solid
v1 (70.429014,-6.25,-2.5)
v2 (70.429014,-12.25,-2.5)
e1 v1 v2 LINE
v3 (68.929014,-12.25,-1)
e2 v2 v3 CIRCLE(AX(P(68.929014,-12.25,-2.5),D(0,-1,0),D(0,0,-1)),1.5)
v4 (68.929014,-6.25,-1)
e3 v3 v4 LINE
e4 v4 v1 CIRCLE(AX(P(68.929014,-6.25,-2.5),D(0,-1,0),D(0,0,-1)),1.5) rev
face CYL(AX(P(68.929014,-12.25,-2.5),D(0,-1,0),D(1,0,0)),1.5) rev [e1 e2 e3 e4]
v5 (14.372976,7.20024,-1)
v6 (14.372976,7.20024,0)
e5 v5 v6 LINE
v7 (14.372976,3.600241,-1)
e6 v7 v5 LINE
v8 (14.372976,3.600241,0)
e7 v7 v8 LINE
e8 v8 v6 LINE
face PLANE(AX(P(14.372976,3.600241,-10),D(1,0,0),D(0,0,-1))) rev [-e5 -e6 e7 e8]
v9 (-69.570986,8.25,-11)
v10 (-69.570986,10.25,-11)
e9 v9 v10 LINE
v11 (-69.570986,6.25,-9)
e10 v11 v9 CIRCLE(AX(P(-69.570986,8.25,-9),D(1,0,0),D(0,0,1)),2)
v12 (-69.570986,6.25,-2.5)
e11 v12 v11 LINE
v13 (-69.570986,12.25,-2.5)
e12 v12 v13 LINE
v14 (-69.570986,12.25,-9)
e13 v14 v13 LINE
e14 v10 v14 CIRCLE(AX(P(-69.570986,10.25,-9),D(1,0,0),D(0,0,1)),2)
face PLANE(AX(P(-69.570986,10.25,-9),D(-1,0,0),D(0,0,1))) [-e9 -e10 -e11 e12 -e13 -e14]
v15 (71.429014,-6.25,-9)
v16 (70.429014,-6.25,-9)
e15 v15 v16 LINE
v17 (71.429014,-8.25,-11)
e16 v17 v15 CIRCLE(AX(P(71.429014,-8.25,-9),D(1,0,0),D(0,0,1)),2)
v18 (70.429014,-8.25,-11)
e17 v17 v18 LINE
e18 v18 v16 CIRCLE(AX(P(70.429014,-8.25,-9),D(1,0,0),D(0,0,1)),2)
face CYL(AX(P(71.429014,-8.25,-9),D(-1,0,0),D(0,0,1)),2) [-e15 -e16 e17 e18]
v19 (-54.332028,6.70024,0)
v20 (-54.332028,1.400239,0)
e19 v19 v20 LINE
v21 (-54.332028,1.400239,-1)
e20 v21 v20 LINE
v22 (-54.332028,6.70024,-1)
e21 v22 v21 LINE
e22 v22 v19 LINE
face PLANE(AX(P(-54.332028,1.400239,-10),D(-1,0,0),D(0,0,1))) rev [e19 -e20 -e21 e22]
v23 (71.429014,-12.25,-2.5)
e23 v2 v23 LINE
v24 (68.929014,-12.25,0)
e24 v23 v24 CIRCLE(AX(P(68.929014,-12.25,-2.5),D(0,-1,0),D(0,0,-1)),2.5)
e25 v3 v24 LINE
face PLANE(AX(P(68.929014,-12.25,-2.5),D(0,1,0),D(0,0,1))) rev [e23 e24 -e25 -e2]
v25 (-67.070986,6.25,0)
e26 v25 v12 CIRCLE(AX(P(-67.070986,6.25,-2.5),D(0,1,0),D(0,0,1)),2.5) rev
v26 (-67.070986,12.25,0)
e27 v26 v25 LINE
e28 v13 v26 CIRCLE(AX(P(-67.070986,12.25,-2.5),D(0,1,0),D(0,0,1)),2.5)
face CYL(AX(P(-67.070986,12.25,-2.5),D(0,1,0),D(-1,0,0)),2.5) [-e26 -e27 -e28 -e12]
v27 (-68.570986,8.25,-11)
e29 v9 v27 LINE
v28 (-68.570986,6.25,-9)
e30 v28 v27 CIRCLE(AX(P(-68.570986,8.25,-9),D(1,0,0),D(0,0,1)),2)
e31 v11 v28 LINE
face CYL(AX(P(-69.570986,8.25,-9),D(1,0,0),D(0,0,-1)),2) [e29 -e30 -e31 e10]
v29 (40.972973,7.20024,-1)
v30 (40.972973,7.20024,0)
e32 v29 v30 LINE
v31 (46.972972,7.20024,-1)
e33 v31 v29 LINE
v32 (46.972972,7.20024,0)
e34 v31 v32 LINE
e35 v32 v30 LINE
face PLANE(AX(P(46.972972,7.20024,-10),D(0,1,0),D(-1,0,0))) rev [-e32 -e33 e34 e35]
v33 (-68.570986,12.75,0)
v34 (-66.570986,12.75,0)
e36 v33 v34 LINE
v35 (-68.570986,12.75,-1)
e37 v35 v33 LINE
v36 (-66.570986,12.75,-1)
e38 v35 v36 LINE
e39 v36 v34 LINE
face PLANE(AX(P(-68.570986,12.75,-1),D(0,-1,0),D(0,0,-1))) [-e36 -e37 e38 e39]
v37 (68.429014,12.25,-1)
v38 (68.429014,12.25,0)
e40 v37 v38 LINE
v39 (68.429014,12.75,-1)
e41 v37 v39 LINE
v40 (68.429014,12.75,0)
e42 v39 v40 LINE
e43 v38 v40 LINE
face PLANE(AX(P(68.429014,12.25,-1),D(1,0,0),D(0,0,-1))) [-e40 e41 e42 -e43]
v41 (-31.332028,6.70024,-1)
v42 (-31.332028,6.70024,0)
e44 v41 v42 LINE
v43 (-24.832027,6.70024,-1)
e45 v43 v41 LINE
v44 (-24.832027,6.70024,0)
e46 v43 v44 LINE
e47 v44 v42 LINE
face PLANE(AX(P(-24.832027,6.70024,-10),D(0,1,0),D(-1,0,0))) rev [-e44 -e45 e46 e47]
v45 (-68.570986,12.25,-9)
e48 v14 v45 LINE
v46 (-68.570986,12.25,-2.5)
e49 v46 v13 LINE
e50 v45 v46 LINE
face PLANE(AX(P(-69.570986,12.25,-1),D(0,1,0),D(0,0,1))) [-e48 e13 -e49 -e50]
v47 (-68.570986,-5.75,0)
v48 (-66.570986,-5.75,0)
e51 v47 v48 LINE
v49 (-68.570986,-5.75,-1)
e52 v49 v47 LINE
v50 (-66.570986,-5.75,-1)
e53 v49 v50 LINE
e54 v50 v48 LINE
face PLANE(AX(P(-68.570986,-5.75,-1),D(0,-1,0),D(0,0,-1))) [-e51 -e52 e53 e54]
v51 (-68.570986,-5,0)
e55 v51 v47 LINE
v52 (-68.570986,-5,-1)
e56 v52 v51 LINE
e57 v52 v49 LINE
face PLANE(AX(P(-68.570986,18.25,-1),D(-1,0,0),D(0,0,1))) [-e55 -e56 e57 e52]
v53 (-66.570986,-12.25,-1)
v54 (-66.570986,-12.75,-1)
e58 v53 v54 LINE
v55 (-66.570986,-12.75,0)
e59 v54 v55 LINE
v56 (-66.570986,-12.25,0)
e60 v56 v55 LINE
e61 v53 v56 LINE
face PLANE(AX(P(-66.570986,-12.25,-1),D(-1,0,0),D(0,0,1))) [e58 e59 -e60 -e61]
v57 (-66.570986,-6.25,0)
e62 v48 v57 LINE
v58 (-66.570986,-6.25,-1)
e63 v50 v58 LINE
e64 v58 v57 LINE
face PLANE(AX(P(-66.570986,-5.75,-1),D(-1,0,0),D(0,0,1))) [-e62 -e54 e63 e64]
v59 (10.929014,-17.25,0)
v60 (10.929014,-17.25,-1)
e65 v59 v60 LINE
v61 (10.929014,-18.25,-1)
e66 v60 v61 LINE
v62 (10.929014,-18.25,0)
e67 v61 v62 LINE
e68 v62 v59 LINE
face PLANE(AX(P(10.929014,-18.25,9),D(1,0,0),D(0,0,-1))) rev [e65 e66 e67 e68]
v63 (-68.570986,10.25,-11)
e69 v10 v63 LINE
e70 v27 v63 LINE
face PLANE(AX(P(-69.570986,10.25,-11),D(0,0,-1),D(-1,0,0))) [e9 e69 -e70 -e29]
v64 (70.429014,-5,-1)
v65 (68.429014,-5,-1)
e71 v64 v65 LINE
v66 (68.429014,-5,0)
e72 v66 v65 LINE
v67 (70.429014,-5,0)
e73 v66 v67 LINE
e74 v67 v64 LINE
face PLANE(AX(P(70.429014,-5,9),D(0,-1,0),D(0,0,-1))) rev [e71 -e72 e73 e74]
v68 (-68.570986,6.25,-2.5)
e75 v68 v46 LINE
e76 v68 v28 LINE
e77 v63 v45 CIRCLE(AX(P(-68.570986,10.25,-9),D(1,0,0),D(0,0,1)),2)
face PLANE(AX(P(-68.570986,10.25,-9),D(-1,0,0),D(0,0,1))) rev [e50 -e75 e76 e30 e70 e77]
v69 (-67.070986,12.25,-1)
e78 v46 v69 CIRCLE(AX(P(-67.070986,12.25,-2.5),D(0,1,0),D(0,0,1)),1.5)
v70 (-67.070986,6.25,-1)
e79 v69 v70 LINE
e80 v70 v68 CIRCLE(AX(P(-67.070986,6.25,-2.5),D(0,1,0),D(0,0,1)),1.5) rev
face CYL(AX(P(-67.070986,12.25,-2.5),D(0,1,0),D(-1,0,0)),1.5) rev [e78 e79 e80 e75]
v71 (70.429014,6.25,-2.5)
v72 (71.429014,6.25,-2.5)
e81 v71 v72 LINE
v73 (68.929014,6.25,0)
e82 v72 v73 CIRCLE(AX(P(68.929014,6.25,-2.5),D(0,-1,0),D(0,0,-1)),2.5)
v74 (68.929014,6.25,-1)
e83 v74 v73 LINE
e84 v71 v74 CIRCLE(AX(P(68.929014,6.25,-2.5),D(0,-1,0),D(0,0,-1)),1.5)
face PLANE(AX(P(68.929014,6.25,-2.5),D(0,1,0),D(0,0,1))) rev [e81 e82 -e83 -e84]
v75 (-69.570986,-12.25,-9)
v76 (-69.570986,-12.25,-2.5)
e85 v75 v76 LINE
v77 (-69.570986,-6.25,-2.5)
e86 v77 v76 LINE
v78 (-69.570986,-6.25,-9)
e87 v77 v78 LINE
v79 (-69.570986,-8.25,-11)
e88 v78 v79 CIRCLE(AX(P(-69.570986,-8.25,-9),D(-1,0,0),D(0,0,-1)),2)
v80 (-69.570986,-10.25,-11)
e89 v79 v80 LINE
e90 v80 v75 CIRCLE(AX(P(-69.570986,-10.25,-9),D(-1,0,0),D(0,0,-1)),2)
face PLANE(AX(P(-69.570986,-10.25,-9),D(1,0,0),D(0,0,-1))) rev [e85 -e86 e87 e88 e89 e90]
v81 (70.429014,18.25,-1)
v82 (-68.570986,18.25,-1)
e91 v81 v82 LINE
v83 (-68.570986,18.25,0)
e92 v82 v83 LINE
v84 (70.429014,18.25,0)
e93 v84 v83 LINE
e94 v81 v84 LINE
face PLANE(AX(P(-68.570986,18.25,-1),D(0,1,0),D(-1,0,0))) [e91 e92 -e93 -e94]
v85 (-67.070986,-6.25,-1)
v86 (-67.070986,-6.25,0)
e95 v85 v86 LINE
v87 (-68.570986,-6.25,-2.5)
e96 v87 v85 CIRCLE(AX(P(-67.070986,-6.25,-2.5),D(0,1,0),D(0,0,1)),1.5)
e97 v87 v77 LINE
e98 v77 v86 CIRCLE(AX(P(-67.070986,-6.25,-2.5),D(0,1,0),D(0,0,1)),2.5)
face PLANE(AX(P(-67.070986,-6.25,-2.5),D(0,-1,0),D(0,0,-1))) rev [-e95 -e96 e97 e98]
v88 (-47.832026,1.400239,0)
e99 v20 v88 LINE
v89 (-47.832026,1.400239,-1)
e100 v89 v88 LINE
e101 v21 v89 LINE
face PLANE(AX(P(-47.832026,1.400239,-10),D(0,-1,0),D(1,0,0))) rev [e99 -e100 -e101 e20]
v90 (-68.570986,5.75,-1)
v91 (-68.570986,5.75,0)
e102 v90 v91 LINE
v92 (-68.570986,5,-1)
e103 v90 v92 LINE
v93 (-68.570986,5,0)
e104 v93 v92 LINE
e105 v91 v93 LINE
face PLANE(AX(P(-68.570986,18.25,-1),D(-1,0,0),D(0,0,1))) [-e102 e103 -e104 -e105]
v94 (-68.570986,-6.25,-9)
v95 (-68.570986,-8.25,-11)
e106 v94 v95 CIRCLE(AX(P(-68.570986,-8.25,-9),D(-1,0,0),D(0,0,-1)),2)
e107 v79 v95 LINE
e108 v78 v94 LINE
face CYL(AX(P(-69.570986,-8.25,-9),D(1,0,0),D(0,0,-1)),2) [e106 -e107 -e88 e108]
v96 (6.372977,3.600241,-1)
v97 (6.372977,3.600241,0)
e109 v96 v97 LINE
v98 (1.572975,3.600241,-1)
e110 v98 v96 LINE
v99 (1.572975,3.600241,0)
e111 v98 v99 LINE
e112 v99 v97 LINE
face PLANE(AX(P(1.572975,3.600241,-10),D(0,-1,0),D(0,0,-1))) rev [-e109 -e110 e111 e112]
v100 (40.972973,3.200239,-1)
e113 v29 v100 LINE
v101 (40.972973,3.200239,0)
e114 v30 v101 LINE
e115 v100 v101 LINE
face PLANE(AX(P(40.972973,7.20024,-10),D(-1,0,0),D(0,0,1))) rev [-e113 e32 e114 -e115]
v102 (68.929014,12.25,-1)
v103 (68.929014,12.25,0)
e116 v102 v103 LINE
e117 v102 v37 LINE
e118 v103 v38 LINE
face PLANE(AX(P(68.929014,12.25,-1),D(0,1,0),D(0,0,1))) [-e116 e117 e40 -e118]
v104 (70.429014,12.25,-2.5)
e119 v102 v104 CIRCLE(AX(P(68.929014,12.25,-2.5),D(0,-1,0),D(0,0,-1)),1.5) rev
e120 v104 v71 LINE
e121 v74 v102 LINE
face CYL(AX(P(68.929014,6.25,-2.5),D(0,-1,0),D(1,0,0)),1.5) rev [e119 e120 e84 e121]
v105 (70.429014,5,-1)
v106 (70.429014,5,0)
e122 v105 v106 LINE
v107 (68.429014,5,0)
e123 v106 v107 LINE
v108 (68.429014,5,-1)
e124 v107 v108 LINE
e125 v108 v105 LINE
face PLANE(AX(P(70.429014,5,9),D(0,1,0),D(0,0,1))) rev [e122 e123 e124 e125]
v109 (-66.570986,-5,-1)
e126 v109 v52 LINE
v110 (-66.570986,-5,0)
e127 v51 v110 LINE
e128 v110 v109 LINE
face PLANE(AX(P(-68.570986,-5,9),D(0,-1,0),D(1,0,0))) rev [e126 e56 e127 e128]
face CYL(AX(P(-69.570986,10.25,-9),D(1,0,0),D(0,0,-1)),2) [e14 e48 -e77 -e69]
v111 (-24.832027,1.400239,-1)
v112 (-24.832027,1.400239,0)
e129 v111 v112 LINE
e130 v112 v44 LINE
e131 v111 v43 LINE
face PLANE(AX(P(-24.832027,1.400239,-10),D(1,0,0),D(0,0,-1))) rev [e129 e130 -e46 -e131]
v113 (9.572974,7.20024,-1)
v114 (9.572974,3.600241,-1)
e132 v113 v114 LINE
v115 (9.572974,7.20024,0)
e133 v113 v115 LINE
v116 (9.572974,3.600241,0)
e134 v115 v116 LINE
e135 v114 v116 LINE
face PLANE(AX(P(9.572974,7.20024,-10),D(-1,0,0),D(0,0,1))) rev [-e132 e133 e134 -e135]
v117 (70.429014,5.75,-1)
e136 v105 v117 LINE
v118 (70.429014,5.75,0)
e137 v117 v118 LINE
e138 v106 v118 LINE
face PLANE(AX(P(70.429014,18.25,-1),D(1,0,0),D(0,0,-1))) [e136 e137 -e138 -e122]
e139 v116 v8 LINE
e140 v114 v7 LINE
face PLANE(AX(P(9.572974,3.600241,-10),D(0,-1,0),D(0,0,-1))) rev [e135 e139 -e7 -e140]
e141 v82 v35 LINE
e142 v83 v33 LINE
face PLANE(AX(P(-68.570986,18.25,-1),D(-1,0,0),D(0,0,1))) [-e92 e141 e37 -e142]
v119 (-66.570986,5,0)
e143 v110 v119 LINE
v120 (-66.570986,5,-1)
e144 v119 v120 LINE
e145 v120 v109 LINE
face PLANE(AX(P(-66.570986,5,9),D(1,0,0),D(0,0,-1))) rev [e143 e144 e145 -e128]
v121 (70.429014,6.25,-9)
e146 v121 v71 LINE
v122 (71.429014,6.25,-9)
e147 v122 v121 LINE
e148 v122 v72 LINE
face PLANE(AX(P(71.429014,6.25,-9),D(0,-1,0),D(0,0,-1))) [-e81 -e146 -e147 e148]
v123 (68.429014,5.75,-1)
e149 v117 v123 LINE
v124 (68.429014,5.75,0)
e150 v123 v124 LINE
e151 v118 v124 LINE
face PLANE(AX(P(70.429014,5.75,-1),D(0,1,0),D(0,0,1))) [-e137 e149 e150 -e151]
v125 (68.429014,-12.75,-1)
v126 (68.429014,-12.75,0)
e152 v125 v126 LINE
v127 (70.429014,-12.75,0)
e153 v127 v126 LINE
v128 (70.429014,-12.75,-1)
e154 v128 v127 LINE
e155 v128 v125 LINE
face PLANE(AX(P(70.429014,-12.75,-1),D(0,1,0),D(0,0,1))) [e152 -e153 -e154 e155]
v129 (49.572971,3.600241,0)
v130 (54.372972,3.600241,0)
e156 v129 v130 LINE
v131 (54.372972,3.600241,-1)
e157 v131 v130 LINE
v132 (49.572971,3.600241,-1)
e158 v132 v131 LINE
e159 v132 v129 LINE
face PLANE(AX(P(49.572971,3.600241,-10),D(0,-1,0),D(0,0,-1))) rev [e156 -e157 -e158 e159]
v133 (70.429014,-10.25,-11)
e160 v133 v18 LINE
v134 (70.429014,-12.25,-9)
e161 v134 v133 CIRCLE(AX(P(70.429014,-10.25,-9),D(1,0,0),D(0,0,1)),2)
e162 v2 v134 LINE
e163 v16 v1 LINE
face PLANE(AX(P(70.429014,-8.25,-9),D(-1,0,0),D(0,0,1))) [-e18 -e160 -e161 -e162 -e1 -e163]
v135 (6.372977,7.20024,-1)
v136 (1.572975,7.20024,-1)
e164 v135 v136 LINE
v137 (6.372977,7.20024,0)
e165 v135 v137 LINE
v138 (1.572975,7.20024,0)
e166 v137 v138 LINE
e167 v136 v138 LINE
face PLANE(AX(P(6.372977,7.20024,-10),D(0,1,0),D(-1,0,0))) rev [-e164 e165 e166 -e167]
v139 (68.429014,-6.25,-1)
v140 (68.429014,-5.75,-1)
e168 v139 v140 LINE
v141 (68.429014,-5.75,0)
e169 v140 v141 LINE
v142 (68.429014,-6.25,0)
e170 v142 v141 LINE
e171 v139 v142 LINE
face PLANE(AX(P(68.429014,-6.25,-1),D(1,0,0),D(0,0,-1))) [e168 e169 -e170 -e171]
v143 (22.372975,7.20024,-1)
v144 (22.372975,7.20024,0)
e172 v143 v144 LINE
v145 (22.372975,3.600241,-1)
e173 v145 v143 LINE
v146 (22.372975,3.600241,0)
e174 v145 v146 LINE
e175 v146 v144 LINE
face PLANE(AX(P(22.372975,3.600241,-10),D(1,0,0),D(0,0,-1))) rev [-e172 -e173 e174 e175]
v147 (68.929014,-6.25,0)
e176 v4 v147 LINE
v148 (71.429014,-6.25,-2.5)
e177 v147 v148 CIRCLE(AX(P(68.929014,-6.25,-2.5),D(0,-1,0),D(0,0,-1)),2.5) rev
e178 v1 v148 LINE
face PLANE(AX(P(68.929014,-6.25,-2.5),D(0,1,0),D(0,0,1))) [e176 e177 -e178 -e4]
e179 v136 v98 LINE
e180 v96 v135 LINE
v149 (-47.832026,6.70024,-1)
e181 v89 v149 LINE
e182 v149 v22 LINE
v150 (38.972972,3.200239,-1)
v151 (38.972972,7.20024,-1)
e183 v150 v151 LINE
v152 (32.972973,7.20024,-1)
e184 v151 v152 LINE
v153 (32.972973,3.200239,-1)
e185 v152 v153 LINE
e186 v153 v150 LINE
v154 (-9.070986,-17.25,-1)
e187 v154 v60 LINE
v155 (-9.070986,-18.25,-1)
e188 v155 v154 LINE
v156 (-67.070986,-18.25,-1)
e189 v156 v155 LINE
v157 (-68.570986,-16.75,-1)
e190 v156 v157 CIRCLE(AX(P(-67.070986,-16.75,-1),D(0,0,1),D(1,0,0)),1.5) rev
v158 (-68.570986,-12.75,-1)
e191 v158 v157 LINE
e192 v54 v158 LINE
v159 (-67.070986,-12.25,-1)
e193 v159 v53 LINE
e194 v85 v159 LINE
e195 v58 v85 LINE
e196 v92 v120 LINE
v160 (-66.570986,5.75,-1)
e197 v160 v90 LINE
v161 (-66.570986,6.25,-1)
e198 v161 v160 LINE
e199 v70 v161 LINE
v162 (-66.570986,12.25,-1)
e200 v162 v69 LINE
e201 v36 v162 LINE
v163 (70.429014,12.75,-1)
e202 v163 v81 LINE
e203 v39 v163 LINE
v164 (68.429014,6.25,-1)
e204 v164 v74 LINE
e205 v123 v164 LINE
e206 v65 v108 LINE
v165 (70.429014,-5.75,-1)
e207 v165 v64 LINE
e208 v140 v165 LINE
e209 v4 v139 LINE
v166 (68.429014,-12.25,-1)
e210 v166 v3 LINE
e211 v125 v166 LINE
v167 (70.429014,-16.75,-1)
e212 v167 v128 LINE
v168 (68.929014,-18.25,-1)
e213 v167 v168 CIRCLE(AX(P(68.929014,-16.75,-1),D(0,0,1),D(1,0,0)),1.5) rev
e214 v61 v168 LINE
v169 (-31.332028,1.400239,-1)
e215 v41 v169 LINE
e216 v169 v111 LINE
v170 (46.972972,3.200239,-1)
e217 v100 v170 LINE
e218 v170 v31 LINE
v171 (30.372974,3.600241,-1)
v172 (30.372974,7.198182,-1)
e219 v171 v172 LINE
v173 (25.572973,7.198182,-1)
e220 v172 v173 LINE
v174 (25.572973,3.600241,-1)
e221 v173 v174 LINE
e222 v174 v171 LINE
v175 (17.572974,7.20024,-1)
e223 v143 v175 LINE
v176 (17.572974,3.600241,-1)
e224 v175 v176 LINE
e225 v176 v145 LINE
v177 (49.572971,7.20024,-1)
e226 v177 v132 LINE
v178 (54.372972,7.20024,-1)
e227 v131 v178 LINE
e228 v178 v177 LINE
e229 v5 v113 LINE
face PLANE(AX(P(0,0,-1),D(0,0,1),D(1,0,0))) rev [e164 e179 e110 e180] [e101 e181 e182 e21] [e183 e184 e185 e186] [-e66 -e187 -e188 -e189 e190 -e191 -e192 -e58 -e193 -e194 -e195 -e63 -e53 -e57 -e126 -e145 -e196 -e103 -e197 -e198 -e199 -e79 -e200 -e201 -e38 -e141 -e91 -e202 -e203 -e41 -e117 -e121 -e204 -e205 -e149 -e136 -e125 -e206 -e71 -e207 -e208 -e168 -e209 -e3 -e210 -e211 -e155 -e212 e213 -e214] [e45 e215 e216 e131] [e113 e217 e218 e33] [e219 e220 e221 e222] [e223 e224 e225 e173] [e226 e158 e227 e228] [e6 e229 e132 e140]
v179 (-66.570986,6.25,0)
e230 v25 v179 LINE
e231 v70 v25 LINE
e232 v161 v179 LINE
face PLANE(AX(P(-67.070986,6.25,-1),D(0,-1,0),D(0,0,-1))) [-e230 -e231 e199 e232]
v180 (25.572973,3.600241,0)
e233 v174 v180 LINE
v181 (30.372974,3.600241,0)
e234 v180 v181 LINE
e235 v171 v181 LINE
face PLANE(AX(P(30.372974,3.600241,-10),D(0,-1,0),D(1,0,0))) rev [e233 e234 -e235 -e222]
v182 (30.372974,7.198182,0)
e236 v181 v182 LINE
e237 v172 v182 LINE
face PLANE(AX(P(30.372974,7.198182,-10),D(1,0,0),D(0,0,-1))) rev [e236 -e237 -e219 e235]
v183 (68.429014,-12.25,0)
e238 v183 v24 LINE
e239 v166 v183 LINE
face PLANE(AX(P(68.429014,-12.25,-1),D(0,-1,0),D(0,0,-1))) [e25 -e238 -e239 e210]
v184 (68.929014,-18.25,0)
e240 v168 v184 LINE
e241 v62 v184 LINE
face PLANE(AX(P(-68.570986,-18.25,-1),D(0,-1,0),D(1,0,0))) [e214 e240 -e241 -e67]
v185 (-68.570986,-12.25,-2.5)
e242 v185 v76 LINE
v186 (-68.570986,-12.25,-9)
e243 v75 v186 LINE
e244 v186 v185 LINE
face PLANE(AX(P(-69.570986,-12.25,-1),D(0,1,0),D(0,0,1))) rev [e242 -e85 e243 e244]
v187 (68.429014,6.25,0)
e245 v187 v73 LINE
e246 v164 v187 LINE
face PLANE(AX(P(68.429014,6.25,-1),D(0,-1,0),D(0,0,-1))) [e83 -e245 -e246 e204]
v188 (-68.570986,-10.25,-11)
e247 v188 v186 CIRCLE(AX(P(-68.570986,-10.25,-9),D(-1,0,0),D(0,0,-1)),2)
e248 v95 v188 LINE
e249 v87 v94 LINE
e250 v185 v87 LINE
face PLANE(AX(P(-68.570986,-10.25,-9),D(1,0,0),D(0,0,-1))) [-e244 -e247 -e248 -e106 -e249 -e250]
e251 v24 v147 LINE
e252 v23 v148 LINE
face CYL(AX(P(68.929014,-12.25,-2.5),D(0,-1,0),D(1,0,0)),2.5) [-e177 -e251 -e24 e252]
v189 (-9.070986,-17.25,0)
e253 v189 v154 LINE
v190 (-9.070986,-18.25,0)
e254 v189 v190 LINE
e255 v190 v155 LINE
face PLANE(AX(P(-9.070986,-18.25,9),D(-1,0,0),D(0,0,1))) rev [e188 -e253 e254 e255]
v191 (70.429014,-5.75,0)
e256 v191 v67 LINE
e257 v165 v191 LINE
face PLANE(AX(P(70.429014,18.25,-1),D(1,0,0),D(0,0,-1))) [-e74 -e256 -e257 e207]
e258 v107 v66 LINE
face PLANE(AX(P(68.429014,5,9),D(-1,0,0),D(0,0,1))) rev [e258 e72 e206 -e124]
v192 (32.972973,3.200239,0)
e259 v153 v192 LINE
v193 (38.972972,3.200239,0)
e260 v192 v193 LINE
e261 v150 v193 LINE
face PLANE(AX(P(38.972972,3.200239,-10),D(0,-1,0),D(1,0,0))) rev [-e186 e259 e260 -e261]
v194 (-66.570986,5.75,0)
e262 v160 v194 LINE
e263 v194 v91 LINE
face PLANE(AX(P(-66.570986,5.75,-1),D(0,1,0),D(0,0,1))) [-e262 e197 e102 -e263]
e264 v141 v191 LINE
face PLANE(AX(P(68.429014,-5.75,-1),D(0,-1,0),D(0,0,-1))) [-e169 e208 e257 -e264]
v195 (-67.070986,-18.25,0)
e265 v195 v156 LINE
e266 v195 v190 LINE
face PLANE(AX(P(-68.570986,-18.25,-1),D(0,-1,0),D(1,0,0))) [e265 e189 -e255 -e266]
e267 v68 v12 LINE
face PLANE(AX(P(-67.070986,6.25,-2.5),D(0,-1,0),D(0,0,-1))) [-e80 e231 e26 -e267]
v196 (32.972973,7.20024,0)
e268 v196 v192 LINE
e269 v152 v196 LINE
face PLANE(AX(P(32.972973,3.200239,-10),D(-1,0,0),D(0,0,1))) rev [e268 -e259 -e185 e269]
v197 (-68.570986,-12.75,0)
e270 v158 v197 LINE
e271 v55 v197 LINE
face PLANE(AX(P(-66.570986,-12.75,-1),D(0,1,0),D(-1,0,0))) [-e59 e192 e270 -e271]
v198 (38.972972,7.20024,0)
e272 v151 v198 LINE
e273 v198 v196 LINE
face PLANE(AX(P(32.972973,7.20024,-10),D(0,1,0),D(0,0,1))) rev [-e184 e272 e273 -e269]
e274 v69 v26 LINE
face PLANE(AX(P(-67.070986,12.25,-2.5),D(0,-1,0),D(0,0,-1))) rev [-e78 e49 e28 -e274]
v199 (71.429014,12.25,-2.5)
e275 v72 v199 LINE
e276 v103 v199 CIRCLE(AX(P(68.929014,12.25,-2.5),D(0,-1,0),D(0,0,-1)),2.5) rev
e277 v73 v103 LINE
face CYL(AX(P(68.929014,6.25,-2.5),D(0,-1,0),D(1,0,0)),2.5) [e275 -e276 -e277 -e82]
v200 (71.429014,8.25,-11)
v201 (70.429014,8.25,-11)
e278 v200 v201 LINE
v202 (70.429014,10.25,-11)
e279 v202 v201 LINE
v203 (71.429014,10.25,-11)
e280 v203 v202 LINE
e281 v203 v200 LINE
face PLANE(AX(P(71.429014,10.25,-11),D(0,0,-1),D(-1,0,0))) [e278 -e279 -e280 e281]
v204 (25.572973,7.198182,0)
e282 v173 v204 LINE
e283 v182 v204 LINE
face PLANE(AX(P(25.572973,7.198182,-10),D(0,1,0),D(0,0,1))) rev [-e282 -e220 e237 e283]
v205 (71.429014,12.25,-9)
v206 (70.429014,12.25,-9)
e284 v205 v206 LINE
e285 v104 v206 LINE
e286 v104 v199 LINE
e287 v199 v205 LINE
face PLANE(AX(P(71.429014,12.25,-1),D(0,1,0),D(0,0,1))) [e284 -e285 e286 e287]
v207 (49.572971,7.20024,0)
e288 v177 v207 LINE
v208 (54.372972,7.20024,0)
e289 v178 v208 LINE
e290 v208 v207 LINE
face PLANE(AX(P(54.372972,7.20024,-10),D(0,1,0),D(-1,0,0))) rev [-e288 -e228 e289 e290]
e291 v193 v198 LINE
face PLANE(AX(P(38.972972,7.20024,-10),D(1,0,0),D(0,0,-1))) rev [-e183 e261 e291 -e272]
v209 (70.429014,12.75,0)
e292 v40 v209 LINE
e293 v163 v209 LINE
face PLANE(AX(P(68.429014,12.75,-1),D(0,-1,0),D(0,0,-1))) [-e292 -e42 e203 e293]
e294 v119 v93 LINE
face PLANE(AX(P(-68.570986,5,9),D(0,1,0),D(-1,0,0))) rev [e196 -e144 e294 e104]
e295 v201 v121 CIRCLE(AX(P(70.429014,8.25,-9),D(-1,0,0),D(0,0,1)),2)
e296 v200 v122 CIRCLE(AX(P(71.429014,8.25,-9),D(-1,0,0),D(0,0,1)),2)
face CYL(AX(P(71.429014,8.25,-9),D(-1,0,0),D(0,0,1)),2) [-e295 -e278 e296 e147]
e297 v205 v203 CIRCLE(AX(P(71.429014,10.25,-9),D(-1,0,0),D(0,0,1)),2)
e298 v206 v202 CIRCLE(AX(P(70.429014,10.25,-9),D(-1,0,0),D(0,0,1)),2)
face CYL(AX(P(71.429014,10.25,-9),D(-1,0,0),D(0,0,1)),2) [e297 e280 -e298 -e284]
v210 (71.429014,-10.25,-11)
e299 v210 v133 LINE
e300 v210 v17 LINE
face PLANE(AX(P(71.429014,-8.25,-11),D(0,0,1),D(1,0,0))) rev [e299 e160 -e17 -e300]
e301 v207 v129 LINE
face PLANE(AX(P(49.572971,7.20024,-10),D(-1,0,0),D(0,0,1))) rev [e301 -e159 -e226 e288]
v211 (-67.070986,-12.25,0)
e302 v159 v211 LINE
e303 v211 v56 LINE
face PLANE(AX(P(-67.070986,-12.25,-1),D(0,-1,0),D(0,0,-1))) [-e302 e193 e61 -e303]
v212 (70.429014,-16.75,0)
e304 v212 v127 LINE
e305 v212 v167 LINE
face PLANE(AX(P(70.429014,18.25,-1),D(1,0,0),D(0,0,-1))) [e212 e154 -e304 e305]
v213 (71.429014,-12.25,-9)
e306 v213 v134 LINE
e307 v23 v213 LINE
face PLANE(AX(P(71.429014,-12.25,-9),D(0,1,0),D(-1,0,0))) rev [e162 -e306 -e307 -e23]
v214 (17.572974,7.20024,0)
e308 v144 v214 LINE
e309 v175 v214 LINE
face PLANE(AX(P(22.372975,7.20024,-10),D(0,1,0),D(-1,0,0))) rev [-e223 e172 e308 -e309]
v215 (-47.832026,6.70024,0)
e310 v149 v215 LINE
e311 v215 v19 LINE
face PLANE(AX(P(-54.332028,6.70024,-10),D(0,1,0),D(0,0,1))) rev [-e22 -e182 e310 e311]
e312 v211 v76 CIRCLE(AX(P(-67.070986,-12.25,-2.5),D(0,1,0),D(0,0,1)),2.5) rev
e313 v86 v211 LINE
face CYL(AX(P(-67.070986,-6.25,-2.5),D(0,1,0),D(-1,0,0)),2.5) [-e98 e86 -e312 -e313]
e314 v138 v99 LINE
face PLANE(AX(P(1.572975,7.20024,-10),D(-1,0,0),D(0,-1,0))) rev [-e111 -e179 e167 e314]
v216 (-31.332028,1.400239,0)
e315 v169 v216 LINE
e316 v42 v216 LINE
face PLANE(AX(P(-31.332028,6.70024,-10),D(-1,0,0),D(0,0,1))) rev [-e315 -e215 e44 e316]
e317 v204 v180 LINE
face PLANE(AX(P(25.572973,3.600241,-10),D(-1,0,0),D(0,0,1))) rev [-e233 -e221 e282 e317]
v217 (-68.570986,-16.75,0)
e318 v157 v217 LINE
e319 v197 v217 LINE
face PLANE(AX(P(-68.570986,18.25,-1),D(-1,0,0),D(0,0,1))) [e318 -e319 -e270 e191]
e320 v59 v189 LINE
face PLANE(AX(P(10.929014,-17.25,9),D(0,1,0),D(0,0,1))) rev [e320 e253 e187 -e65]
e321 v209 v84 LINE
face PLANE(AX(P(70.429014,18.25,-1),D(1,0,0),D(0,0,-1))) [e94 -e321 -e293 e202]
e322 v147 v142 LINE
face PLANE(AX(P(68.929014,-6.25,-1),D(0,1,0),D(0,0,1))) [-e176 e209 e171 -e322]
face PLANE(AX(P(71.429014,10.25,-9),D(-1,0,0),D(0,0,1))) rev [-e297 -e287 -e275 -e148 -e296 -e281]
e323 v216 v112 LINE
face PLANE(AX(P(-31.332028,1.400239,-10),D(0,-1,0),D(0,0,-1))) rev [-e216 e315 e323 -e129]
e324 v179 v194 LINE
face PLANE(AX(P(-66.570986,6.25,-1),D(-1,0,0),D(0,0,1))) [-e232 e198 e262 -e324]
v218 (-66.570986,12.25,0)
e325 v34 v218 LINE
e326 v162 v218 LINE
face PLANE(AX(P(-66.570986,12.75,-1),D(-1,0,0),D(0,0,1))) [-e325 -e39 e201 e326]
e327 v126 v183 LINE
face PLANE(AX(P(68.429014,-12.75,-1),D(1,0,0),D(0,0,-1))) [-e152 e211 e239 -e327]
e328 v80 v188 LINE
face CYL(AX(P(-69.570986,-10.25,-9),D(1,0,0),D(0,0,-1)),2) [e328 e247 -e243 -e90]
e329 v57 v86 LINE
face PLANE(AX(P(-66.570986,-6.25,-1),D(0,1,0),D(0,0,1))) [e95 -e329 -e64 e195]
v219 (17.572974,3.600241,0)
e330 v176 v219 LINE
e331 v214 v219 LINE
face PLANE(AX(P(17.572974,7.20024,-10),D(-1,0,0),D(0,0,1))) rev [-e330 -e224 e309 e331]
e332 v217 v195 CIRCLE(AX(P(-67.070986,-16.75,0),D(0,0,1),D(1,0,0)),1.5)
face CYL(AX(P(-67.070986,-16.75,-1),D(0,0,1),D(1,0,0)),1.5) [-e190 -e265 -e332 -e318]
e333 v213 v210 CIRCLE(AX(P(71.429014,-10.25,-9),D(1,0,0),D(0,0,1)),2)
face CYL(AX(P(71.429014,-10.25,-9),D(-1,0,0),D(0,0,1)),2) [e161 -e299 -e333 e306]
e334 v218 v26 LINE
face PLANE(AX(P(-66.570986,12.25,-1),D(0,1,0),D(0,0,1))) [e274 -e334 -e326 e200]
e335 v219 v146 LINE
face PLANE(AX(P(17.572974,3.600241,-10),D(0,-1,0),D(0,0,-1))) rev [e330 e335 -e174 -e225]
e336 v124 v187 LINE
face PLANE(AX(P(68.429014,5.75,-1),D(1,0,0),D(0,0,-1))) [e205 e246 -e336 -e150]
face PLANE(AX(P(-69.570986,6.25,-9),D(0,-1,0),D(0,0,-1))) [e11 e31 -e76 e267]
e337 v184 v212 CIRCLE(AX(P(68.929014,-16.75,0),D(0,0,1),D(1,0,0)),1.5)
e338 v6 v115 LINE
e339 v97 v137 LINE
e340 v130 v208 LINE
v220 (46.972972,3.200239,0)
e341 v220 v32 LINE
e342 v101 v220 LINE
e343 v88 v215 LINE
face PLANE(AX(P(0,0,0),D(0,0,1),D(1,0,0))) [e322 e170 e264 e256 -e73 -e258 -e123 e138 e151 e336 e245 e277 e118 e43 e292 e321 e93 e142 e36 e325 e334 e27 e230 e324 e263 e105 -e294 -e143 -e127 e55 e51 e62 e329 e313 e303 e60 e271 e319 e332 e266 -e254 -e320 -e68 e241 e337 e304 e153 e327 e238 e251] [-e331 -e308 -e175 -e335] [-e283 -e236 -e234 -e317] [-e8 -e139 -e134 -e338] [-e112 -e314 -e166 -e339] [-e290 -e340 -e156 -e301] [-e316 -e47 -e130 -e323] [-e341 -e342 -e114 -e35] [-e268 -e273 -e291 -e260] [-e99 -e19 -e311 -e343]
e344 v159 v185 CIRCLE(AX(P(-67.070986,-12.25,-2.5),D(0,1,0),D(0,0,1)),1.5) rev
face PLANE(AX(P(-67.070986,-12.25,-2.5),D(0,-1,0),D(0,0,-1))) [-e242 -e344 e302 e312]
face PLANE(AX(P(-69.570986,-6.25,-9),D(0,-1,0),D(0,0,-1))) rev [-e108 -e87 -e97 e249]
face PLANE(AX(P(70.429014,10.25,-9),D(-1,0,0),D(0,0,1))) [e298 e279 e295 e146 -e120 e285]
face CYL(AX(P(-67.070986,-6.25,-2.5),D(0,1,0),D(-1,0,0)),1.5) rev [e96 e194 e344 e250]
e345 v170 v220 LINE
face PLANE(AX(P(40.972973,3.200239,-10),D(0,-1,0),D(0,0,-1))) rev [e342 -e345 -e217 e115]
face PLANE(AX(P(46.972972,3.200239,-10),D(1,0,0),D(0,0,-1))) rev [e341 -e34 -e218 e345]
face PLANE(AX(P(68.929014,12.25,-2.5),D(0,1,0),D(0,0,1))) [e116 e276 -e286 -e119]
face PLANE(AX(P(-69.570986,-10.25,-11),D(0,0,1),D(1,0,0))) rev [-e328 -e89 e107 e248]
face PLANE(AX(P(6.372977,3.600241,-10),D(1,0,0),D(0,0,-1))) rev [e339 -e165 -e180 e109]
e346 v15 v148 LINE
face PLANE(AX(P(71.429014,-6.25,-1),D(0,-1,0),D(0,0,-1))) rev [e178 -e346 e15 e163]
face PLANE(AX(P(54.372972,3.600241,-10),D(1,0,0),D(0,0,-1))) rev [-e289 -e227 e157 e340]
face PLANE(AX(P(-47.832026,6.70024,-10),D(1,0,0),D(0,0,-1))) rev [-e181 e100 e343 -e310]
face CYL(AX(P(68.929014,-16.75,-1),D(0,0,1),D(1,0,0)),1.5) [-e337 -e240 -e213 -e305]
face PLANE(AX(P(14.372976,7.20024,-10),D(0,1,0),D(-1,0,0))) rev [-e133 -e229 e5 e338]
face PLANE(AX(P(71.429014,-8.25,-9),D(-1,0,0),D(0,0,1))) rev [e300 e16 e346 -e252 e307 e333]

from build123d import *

# Parameters (mm, degrees)
SKETCH1_W                       = 139
SKETCH1_H                       = 36.5
BASE_FLANGE1_DEPTH              = 1
EDGE_FLANGE1_STRIP_W            = 7
EDGE_FLANGE1_STRIP_H            = 1
EDGE_FLANGE1_STRIP_CUT_DEPTH    = 6
EDGE_FLANGE1_RELIEF_W           = 7.5
EDGE_FLANGE1_RELIEF_H           = 0.5
EDGE_FLANGE1_RELIEF_CUT_DEPTH   = 1
EDGE_FLANGE1_STRIP_2_W          = 7
EDGE_FLANGE1_STRIP_2_H          = 1
EDGE_FLANGE1_STRIP_CUT_2_DEPTH  = 6
EDGE_FLANGE1_RELIEF_2_W         = 7.5
EDGE_FLANGE1_RELIEF_2_H         = 0.5
EDGE_FLANGE1_RELIEF_CUT_2_DEPTH = 1
EDGE_FLANGE1_DEPTH              = 6
EDGE_FLANGE1_START              = -1
EDGE_FLANGE1_FLAT_DEPTH         = 1
EDGE_FLANGE1_BEND_DEPTH         = 6
EDGE_FLANGE1_FLAT_2_DEPTH       = 1
EDGE_FLANGE2_STRIP_W            = 7
EDGE_FLANGE2_STRIP_H            = 1
EDGE_FLANGE2_STRIP_CUT_DEPTH    = 6
EDGE_FLANGE2_RELIEF_W           = 7.5
EDGE_FLANGE2_RELIEF_H           = 0.5
EDGE_FLANGE2_RELIEF_CUT_DEPTH   = 1
EDGE_FLANGE2_STRIP_2_W          = 7
EDGE_FLANGE2_STRIP_2_H          = 1
EDGE_FLANGE2_STRIP_CUT_2_DEPTH  = 6
EDGE_FLANGE2_RELIEF_2_W         = 7.5
EDGE_FLANGE2_RELIEF_2_H         = 0.5
EDGE_FLANGE2_RELIEF_CUT_2_DEPTH = 1
EDGE_FLANGE2_DEPTH              = 6
EDGE_FLANGE2_START              = 1
EDGE_FLANGE2_FLAT_DEPTH         = 1
EDGE_FLANGE2_BEND_DEPTH         = 6
EDGE_FLANGE2_FLAT_2_DEPTH       = 1
SKETCH20_W                      = 20
SKETCH20_H                      = 1
SKETCH20_W_2                    = 2
SKETCH20_H_2                    = 10
CUT_EXTRUDE1_DEPTH              = 10
FILLET1_R                       = 1.5
SKETCH28_W                      = 4.80000148
SKETCH28_H                      = 3.5999988
SKETCH28_H_2                    = 3.597941299
SKETCH28_W_2                    = 5.99999908
SKETCH28_H_3                    = 4.00000054
SKETCH28_W_3                    = 6.50000116
SKETCH28_H_4                    = 5.30000102
CUT_EXTRUDE3_DEPTH              = 10


# Sheet-metal steps are written as plain solids
with BuildPart() as part:
    # Sketch1 → Base-Flange1 (new body)
    with BuildSketch(Plane.XY):
        with Locations((0.929014267, 0)):
            Rectangle(SKETCH1_W, SKETCH1_H)
    extrude(amount=-BASE_FLANGE1_DEPTH)

    # Edge-Flange1 strip (across the edge) → Edge-Flange1 strip cut (cut)
    with BuildSketch(Plane(origin=(-68.570985733, 6.25, -1), x_dir=(1, 0, 0), z_dir=(0, 1, 0))):
        with Locations((-2, -0.5)):
            Rectangle(EDGE_FLANGE1_STRIP_W, EDGE_FLANGE1_STRIP_H)
    extrude(amount=EDGE_FLANGE1_STRIP_CUT_DEPTH, mode=Mode.SUBTRACT)

    # Edge-Flange1 relief (on the sheet) → Edge-Flange1 relief cut (cut)
    with BuildSketch(Plane(origin=(-67.070985733, 6.25, -1), x_dir=(1, 0, 0), z_dir=(0, 0, -1))):
        with Locations((-3.25, 0.25)):
            Rectangle(EDGE_FLANGE1_RELIEF_W, EDGE_FLANGE1_RELIEF_H)
        with Locations((-3.25, -6.25)):
            Rectangle(EDGE_FLANGE1_RELIEF_W, EDGE_FLANGE1_RELIEF_H)
    extrude(amount=-EDGE_FLANGE1_RELIEF_CUT_DEPTH, mode=Mode.SUBTRACT)

    # Edge-Flange1 strip 2 (across the edge) → Edge-Flange1 strip cut 2 (cut)
    with BuildSketch(Plane(origin=(70.429014267, 12.25, -1), x_dir=(-1, 0, 0), z_dir=(0, -1, 0))):
        with Locations((-2, -0.5)):
            Rectangle(EDGE_FLANGE1_STRIP_2_W, EDGE_FLANGE1_STRIP_2_H)
    extrude(amount=EDGE_FLANGE1_STRIP_CUT_2_DEPTH, mode=Mode.SUBTRACT)

    # Edge-Flange1 relief 2 (on the sheet) → Edge-Flange1 relief cut 2 (cut)
    with BuildSketch(Plane(origin=(68.929014267, 12.25, -1), x_dir=(-1, 0, 0), z_dir=(0, 0, -1))):
        with Locations((-3.25, 0.25)):
            Rectangle(EDGE_FLANGE1_RELIEF_2_W, EDGE_FLANGE1_RELIEF_2_H)
        with Locations((-3.25, -6.25)):
            Rectangle(EDGE_FLANGE1_RELIEF_2_W, EDGE_FLANGE1_RELIEF_2_H)
    extrude(amount=-EDGE_FLANGE1_RELIEF_CUT_2_DEPTH, mode=Mode.SUBTRACT)

    # Edge-Flange1 bend section (across the edge) → Edge-Flange1 (add)
    with BuildSketch(Plane(origin=(-68.570985733, 6.25, -1), x_dir=(1, 0, 0), z_dir=(0, 1, 0))):
        with BuildLine():
            Line((-1, 1.5), (0, 1.5))
            ThreePointArc((0, 1.5), (0.439339828, 0.439339828), (1.5, 0))
            Line((1.5, 0), (1.5, -1))
            ThreePointArc((1.5, -1), (-0.267766953, -0.267766953), (-1, 1.5))
        make_face()
    extrude(amount=EDGE_FLANGE1_DEPTH)

    # Edge-Flange1 profile (on flange) → Edge-Flange1 flat (add)
    with BuildSketch(Plane(origin=(-68.570985733, 0, -1), x_dir=(0, -1, 0), z_dir=(1, 0, 0)).offset(EDGE_FLANGE1_START)):
        with BuildLine():
            ThreePointArc((-6.25, 8), (-6.835786438, 9.414213562), (-8.25, 10))
            Line((-8.25, 10), (-10.25, 10))
            ThreePointArc((-10.25, 10), (-11.664213562, 9.414213562), (-12.25, 8))
            Line((-12.25, 8), (-12.25, 1.5))
            Line((-12.25, 1.5), (-6.25, 1.5))
            Line((-6.25, 1.5), (-6.25, 8))
        make_face()
    extrude(amount=EDGE_FLANGE1_FLAT_DEPTH)

    # Edge-Flange1 bend section 2 (across the edge) → Edge-Flange1 bend (add)
    with BuildSketch(Plane(origin=(70.429014267, 12.25, -1), x_dir=(-1, 0, 0), z_dir=(0, -1, 0))):
        with BuildLine():
            Line((-1, 1.5), (0, 1.5))
            ThreePointArc((0, 1.5), (0.439339828, 0.439339828), (1.5, 0))
            Line((1.5, 0), (1.5, -1))
            ThreePointArc((1.5, -1), (-0.267766953, -0.267766953), (-1, 1.5))
        make_face()
    extrude(amount=EDGE_FLANGE1_BEND_DEPTH)

    # Edge-Flange1 profile 2 (on flange) → Edge-Flange1 flat 2 (add)
    with BuildSketch(Plane(origin=(70.429014267, 0, -1), x_dir=(0, 1, 0), z_dir=(-1, 0, 0)).offset(EDGE_FLANGE1_START)):
        with BuildLine():
            Line((12.25, 1.5), (12.25, 8))
            ThreePointArc((12.25, 8), (11.664213562, 9.414213562), (10.25, 10))
            Line((10.25, 10), (8.25, 10))
            ThreePointArc((8.25, 10), (6.835786438, 9.414213562), (6.25, 8))
            Line((6.25, 8), (6.25, 1.5))
            Line((6.25, 1.5), (12.25, 1.5))
        make_face()
    extrude(amount=EDGE_FLANGE1_FLAT_2_DEPTH)

    # Edge-Flange2 strip (across the edge) → Edge-Flange2 strip cut (cut)
    with BuildSketch(Plane(origin=(70.429014267, -6.25, -1), x_dir=(-1, 0, 0), z_dir=(0, -1, 0))):
        with Locations((-2, -0.5)):
            Rectangle(EDGE_FLANGE2_STRIP_W, EDGE_FLANGE2_STRIP_H)
    extrude(amount=EDGE_FLANGE2_STRIP_CUT_DEPTH, mode=Mode.SUBTRACT)

    # Edge-Flange2 relief (on the sheet) → Edge-Flange2 relief cut (cut)
    with BuildSketch(Plane(origin=(68.929014267, -6.25, -1), x_dir=(-1, 0, 0), z_dir=(0, 0, -1))):
        with Locations((-3.25, 0.25)):
            Rectangle(EDGE_FLANGE2_RELIEF_W, EDGE_FLANGE2_RELIEF_H)
        with Locations((-3.25, -6.25)):
            Rectangle(EDGE_FLANGE2_RELIEF_W, EDGE_FLANGE2_RELIEF_H)
    extrude(amount=-EDGE_FLANGE2_RELIEF_CUT_DEPTH, mode=Mode.SUBTRACT)

    # Edge-Flange2 strip 2 (across the edge) → Edge-Flange2 strip cut 2 (cut)
    with BuildSketch(Plane(origin=(-68.570985733, -12.25, -1), x_dir=(1, 0, 0), z_dir=(0, 1, 0))):
        with Locations((-2, -0.5)):
            Rectangle(EDGE_FLANGE2_STRIP_2_W, EDGE_FLANGE2_STRIP_2_H)
    extrude(amount=EDGE_FLANGE2_STRIP_CUT_2_DEPTH, mode=Mode.SUBTRACT)

    # Edge-Flange2 relief 2 (on the sheet) → Edge-Flange2 relief cut 2 (cut)
    with BuildSketch(Plane(origin=(-67.070985733, -12.25, -1), x_dir=(1, 0, 0), z_dir=(0, 0, -1))):
        with Locations((-3.25, 0.25)):
            Rectangle(EDGE_FLANGE2_RELIEF_2_W, EDGE_FLANGE2_RELIEF_2_H)
        with Locations((-3.25, -6.25)):
            Rectangle(EDGE_FLANGE2_RELIEF_2_W, EDGE_FLANGE2_RELIEF_2_H)
    extrude(amount=-EDGE_FLANGE2_RELIEF_CUT_2_DEPTH, mode=Mode.SUBTRACT)

    # Edge-Flange2 bend section (across the edge) → Edge-Flange2 (add)
    with BuildSketch(Plane(origin=(70.429014267, -6.25, -1), x_dir=(-1, 0, 0), z_dir=(0, -1, 0))):
        with BuildLine():
            Line((-1, 1.5), (0, 1.5))
            ThreePointArc((0, 1.5), (0.439339828, 0.439339828), (1.5, 0))
            Line((1.5, 0), (1.5, -1))
            ThreePointArc((1.5, -1), (-0.267766953, -0.267766953), (-1, 1.5))
        make_face()
    extrude(amount=EDGE_FLANGE2_DEPTH)

    # Edge-Flange2 profile (on flange) → Edge-Flange2 flat (add)
    with BuildSketch(Plane(origin=(70.429014267, 0, -1), x_dir=(0, -1, 0), z_dir=(1, 0, 0)).offset(EDGE_FLANGE2_START)):
        with BuildLine():
            Line((12.25, 1.5), (12.25, 8))
            ThreePointArc((12.25, 8), (11.664213562, 9.414213562), (10.25, 10))
            Line((10.25, 10), (8.25, 10))
            ThreePointArc((8.25, 10), (6.835786438, 9.414213562), (6.25, 8))
            Line((6.25, 8), (6.25, 1.5))
            Line((6.25, 1.5), (12.25, 1.5))
        make_face()
    extrude(amount=-EDGE_FLANGE2_FLAT_DEPTH)

    # Edge-Flange2 bend section 2 (across the edge) → Edge-Flange2 bend (add)
    with BuildSketch(Plane(origin=(-68.570985733, -12.25, -1), x_dir=(1, 0, 0), z_dir=(0, 1, 0))):
        with BuildLine():
            Line((-1, 1.5), (0, 1.5))
            ThreePointArc((0, 1.5), (0.439339828, 0.439339828), (1.5, 0))
            Line((1.5, 0), (1.5, -1))
            ThreePointArc((1.5, -1), (-0.267766953, -0.267766953), (-1, 1.5))
        make_face()
    extrude(amount=EDGE_FLANGE2_BEND_DEPTH)

    # Edge-Flange2 profile 2 (on flange) → Edge-Flange2 flat 2 (add)
    with BuildSketch(Plane(origin=(-68.570985733, 0, -1), x_dir=(0, 1, 0), z_dir=(-1, 0, 0)).offset(EDGE_FLANGE2_START)):
        with BuildLine():
            ThreePointArc((-6.25, 8), (-6.835786438, 9.414213562), (-8.25, 10))
            Line((-8.25, 10), (-10.25, 10))
            ThreePointArc((-10.25, 10), (-11.664213562, 9.414213562), (-12.25, 8))
            Line((-12.25, 8), (-12.25, 1.5))
            Line((-12.25, 1.5), (-6.25, 1.5))
            Line((-6.25, 1.5), (-6.25, 8))
        make_face()
    extrude(amount=-EDGE_FLANGE2_FLAT_2_DEPTH)

    # Sketch20 → Cut-Extrude1 (cut)
    with BuildSketch(Plane(origin=(0, 0, -1), x_dir=(-1, 0, 0), z_dir=(0, 0, -1))):
        with Locations((-0.929014267, -17.75)):
            Rectangle(SKETCH20_W, SKETCH20_H)
        with Locations((-69.429014267, 0)):
            Rectangle(SKETCH20_W_2, SKETCH20_H_2)
        with Locations((67.570985733, 0)):
            Rectangle(SKETCH20_W_2, SKETCH20_H_2)
    extrude(amount=-CUT_EXTRUDE1_DEPTH, mode=Mode.SUBTRACT)

    # Fillet1
    fillet1_edges = [part.edges().sort_by_distance(p)[0] for p in [
        (70.429014267, -18.25, -0.5),
        (-68.570985733, -18.25, -0.5),
    ]]
    fillet(fillet1_edges, radius=FILLET1_R)

    # Sketch28 → Cut-Extrude3 (cut)
    with BuildSketch(Plane.XY):
        with Locations((3.972975907, 5.4002406)):
            Rectangle(SKETCH28_W, SKETCH28_H)
        with Locations((11.972975147, 5.4002406)):
            Rectangle(SKETCH28_W, SKETCH28_H)
        with Locations((19.972974387, 5.4002406)):
            Rectangle(SKETCH28_W, SKETCH28_H)
        with Locations((27.972973627, 5.39921185)):
            Rectangle(SKETCH28_W, SKETCH28_H_2)
        with Locations((35.972972867, 5.20023973)):
            Rectangle(SKETCH28_W_2, SKETCH28_H_3)
        with Locations((43.972972107, 5.20023973)):
            Rectangle(SKETCH28_W_2, SKETCH28_H_3)
        with Locations((51.972971347, 5.4002406)):
            Rectangle(SKETCH28_W, SKETCH28_H)
        with Locations((-51.082027013, 4.05023949)):
            Rectangle(SKETCH28_W_3, SKETCH28_H_4)
        with Locations((-28.082027293, 4.05023949)):
            Rectangle(SKETCH28_W_3, SKETCH28_H_4)
    extrude(amount=-CUT_EXTRUDE3_DEPTH, mode=Mode.SUBTRACT)


solid = part.part
